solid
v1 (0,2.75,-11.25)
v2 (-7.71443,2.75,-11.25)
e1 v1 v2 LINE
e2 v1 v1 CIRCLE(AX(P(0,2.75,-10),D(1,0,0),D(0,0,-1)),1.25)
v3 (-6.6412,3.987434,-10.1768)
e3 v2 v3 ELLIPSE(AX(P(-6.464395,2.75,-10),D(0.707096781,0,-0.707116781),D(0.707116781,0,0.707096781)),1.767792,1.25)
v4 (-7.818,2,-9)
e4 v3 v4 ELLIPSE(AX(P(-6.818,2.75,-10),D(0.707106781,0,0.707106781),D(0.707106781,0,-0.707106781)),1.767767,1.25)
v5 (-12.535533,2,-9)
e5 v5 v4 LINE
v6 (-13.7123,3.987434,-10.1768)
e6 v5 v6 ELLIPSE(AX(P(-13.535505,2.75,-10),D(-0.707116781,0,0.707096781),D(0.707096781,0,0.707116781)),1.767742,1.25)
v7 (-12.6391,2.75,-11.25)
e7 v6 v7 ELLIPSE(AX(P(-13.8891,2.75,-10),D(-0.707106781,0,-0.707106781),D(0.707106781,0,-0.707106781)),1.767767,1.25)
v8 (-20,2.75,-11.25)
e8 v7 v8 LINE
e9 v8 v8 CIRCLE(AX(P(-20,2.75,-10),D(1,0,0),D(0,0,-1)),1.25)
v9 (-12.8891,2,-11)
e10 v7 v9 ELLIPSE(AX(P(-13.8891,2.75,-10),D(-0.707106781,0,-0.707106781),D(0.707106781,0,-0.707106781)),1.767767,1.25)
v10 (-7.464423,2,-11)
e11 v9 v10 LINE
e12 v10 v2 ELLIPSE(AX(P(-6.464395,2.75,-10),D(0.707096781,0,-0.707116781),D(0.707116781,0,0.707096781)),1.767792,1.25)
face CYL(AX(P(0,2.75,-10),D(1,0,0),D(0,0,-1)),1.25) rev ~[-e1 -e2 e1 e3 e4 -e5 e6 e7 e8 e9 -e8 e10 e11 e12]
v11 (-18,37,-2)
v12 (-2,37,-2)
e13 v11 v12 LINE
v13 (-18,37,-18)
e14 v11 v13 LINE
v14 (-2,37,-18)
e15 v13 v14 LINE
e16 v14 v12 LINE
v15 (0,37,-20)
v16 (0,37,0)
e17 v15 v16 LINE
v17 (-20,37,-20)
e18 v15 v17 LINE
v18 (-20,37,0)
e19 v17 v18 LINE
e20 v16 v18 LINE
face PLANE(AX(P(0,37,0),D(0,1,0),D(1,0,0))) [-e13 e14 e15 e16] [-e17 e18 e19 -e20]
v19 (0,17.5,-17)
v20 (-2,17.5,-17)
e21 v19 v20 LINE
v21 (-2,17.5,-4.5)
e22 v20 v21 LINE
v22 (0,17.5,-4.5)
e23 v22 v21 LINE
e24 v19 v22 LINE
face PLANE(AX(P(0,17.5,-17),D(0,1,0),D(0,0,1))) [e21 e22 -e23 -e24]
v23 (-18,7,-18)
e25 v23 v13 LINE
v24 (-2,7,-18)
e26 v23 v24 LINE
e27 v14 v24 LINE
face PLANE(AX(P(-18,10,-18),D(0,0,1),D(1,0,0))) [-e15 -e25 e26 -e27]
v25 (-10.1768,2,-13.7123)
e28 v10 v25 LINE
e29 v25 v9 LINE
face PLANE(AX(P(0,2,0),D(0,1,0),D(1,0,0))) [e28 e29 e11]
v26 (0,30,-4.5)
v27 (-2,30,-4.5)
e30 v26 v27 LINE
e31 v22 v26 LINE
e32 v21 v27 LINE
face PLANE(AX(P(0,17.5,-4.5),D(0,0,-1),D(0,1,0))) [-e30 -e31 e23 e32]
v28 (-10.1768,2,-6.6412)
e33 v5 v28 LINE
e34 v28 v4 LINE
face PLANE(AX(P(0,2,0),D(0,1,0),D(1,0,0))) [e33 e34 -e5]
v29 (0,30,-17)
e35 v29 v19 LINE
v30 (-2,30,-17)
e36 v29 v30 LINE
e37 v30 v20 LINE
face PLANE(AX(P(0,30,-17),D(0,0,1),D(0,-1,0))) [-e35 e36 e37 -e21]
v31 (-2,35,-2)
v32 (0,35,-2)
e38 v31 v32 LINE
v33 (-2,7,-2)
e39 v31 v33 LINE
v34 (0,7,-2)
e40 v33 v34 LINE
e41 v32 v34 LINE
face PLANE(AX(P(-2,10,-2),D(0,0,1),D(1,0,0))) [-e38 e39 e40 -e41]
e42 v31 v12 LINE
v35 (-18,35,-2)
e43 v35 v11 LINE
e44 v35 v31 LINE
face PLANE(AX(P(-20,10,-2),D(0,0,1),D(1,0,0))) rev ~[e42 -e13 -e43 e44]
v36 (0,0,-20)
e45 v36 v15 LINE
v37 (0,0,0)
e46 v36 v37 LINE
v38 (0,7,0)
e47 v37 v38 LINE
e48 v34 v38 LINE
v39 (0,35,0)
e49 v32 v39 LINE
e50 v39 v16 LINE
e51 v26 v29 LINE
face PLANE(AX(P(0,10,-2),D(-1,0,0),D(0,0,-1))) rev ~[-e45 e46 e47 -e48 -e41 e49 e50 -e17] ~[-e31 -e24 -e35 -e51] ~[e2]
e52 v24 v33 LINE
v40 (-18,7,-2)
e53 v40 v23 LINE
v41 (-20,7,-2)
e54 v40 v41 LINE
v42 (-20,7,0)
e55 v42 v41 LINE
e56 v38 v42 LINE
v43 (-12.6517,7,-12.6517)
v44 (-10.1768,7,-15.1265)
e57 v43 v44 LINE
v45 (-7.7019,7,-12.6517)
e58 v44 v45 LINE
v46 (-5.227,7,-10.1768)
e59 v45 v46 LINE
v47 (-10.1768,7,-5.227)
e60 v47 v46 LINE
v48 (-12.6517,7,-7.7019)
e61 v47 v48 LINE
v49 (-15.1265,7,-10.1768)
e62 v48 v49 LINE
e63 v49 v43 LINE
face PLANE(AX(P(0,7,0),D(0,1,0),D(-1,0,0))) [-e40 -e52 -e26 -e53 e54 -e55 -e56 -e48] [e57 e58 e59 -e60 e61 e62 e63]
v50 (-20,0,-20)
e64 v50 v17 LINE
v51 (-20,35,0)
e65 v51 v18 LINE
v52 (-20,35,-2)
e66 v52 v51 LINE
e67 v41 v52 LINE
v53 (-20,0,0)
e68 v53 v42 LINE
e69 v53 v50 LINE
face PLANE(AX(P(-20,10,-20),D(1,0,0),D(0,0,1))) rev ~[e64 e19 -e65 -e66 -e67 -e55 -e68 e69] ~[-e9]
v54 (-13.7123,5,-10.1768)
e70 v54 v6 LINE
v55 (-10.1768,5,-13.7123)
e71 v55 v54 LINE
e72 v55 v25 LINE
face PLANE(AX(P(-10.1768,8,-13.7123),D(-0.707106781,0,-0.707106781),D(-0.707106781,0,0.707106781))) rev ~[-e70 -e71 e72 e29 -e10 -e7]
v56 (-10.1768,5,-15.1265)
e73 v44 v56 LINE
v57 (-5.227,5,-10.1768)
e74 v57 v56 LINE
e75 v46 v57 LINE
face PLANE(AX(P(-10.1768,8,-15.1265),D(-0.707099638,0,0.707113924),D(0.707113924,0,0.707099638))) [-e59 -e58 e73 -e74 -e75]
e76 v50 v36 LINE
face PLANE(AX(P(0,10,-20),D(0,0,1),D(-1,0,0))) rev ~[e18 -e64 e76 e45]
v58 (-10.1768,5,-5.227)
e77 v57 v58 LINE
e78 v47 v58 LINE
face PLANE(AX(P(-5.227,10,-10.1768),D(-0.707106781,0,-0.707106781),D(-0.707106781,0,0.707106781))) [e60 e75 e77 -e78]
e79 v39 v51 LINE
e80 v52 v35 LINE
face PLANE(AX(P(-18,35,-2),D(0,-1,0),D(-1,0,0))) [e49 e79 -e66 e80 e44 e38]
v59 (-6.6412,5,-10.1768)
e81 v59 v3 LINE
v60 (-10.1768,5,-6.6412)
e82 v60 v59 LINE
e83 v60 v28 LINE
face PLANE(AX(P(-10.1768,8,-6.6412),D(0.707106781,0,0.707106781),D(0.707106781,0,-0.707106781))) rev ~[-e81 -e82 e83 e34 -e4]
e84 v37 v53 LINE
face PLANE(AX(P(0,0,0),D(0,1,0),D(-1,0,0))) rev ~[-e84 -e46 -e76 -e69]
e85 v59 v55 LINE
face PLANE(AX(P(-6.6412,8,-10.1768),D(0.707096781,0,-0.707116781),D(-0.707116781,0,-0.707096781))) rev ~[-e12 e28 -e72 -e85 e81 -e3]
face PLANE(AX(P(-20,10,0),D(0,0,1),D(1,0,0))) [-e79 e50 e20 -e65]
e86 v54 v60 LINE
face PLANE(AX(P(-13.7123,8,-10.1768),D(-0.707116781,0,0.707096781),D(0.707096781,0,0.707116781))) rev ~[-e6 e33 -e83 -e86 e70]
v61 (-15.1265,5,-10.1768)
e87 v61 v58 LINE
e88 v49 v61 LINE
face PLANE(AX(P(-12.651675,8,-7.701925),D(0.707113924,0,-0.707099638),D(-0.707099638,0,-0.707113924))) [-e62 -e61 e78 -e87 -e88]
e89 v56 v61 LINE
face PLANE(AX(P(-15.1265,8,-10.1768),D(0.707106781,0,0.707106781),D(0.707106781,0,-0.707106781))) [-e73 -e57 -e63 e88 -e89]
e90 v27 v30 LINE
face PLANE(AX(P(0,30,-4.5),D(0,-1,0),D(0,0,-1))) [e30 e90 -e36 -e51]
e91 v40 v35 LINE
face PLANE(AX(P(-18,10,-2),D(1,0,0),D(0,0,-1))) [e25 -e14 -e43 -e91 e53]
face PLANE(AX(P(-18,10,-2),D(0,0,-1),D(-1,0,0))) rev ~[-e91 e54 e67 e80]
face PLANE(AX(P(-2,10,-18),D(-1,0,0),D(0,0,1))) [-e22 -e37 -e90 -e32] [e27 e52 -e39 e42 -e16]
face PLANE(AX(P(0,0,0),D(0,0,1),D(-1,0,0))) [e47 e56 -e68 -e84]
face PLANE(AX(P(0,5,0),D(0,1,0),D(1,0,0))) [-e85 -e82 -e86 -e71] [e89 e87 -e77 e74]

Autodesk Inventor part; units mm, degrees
ref_plane "YZ Plane" through (0, 0, 0) normal (1, 0, 0) x (0, 1, 0)
sketch "Sketch1" plane through (0, 0, 0) normal (0, 1, 0) x (-1, 0, 0)
  line L0 (0, 0) -> (20, 0)
  line L1 (20, 0) -> (20, -20)
  line L2 (20, -20) -> (0, -20)
  line L3 (0, -20) -> (0, 0)
  dimension "d0" = 20
  dimension "d1" = 20
extrude "Extrusion1" add sketch "Sketch1" along normal blind 10
sketch "Sketch4" plane through (0, 10, 0) normal (0, 1, 0) x (1, 0, 0)
  line L0 (0, 20) -> (-20, 20) projected
  line L1 (-20, 20) -> (-20, 0) projected
  line L2 (-20, 0) -> (0, 0) projected
  line L3 (0, 0) -> (0, 20) projected
  line L4 (0, 20) -> (-20, 20) projected
  line L5 (-20, 20) -> (0, 0)
  line L6 (-10.1768, 10.1768) -> (-7.7019, 12.6517)
  line L7 (-7.7019, 12.6517) -> (-5.227, 10.1768)
  line L8 (-5.227, 10.1768) -> (-7.7019, 7.7019)
  line L9 (-7.7019, 7.7019) -> (-10.1768, 10.1768)
  line L10 (-10.1768, 10.1768) -> (-12.6517, 7.7019)
  line L11 (-12.6517, 7.7019) -> (-15.1265, 10.1768)
  line L12 (-15.1265, 10.1768) -> (-12.6517, 12.6517)
  line L13 (-12.6517, 12.6517) -> (-10.1768, 10.1768)
  line L14 (-12.6517, 12.6517) -> (-10.1768, 15.1265)
  line L15 (-10.1768, 15.1265) -> (-7.7019, 12.6517)
  line L16 (-7.7019, 12.6517) -> (-10.1768, 10.1768)
  line L17 (-10.1768, 10.1768) -> (-12.6517, 12.6517)
  line L18 (-12.6517, 7.7019) -> (-10.1768, 10.1768)
  line L19 (-10.1768, 10.1768) -> (-7.7019, 7.7019)
  line L20 (-7.7019, 7.7019) -> (-10.1768, 5.227)
  line L21 (-10.1768, 5.227) -> (-12.6517, 7.7019)
  dimension "d10" = 3.5
  dimension "d11" = 3.5
  dimension "d12" = 3.5
  dimension "d13" = 3.5
extrude "Extrusion3" cut sketch "Sketch4" against normal blind 8 contours L14 L15 L6 L5 | L5 L10 L11 L12 | L20 L21 L10 L5 | L5 L6 L7 L8
sketch "Sketch5" plane through (0, 10, 0) normal (0, 1, 0) x (1, 0, 0)
  line L0 (-5.227, 10.1768) -> (-10.1768, 5.227) projected
  line L1 (-10.1768, 5.227) -> (-15.1265, 10.1768) projected
  line L2 (-15.1265, 10.1768) -> (-10.1768, 15.1265) projected
  line L3 (-10.1768, 15.1265) -> (-5.227, 10.1768) projected
  line L4 (0, 20) -> (-20, 20) projected
  line L5 (-20, 20) -> (-20, 0) projected
  line L6 (-20, 0) -> (0, 0) projected
  line L7 (0, 0) -> (0, 20) projected
  line L8 (-18, 18) -> (-2, 18)
  line L9 (-2, 18) -> (-2, 2)
  line L10 (-2, 2) -> (-18, 2)
  line L11 (-18, 2) -> (-18, 18)
  line L12 (-18, 2) -> (-18, 0)
  line L13 (-2, 2) -> (-2, 0)
  line L14 (-20, 0) -> (0, 0) projected
  line L15 (-18, 2) -> (-20, 2)
  line L16 (-20, 20) -> (-20, 0) projected
  line L17 (-2, 2) -> (0, 2)
  line L18 (0, 0) -> (0, 20) projected
  point P0 (0, 2)
  dimension "d16" = 2
extrude "Extrusion4" add sketch "Sketch5" along normal blind 27 contours L7 L17 L9 L8 L11 L15 L5 L4
ref_plane "Work Plane1" through (-10, 10, -2) normal (1, 0, 0) x (0, 0, -1)
sketch "Sketch6" plane through (-10, 10, -2) normal (1, 0, 0) x (0, 0, -1)
  line L0 (3.227, 0) -> (8.1768, 0) projected
  line L1 (3.227, 0) -> (3.227, -8) projected
  line L2 (3.227, -8) -> (8.1768, -8) projected
  line L3 (8.1768, 0) -> (8.1768, -8) projected
  line L4 (8.1768, 0) -> (13.1265, 0) projected
  line L5 (8.1768, 0) -> (8.1768, -8) projected
  line L6 (8.1768, -8) -> (13.1265, -8) projected
  line L7 (13.1265, 0) -> (13.1265, -8) projected
  line L8 (16, 0) -> (0, 0) projected
  line L9 (16, 0) -> (16, 27) projected
  line L10 (0, 27) -> (16, 27) projected
  line L11 (0, 0) -> (0, 27) projected
  line L12 (8.1768, 0) -> (8.1768, -8) projected
  line L13 (8.1768, -8) -> (8.1768, -7.25)
  circle A0 centre (8.1768, -7.25) radius 0.75
  point P0 (-2, -10)
  dimension "d20" = 0.75
  dimension "d21" = 1.5
extrude "Extrusion5" cut sketch "Sketch6" along normal mid plane 27 contours A0 L3 | L3 A0
ref_plane "Work Plane2" through (-20, 0, -10) normal (0, 0, 1) x (1, 0, 0)
sketch "Sketch8" plane through (-20, 10, -2) normal (0, 0, 1) x (1, 0, 0)
  line L0 (2, 0) -> (0, 0) projected
  line L1 (2, 0) -> (2, 27) projected
  line L2 (0, 27) -> (2, 27) projected
  line L3 (0, 0) -> (0, 27) projected
  line L4 (20, 0) -> (18, 0) projected
  line L5 (20, 0) -> (20, 27) projected
  line L6 (18, 27) -> (20, 27) projected
  line L7 (18, 0) -> (18, 27) projected
  line L8 (20, 27) -> (0, 27) projected
  line L9 (0, 27) -> (20, 27)
  line L10 (20, 27) -> (20, 25)
  line L11 (20, 25) -> (0, 25)
  line L12 (0, 25) -> (0, 27)
  point P0 (20, -10)
  point P1 (0, 25)
  dimension "d30" = 20
  dimension "d31" = 2
extrude "Extrusion6" add sketch "Sketch8" along normal blind 2 contours L11 L3 L2 L1 | L1 L8 L7 L11 | L7 L6 L5 L11
ref_plane "Work Plane3" through (0, 8, 0) normal (0, 1, 0) x (1, 0, 0)
sketch "Sketch9" plane through (0, 8, 0) normal (0, 1, 0) x (1, 0, 0)
  line L0 (-10.1768, 15.1265) -> (-5.227, 10.1768) projected
  line L1 (-15.1265, 10.1768) -> (-10.1768, 15.1265) projected
  line L2 (-10.1768, 5.227) -> (-15.1265, 10.1768) projected
  line L3 (-5.227, 10.1768) -> (-10.1768, 5.227) projected
  line L4 (-6.6412, 10.1768) -> (-10.1768, 13.7123)
  line L5 (-10.1768, 13.7123) -> (-13.7123, 10.1768)
  line L6 (-13.7123, 10.1768) -> (-10.1768, 6.6412)
  line L7 (-10.1768, 6.6412) -> (-6.6412, 10.1768)
  point P0 (0, 0)
  dimension "d35" = 1
extrude "Extrusion7" add sketch "Sketch9" against normal blind 6
extrude "Extrusion8" cut sketch "Sketch6" along normal mid plane 27 contours A0 L3 | L3 A0
sketch "Sketch10" plane through (0, 0, 0) normal (1, 0, 0) x (0, 0, -1)
  line L0 (0, 0) -> (20, 0) projected
  line L1 (20, 0) -> (20, 37) projected
  line L2 (20, 37) -> (0, 37) projected
  line L3 (0, 35) -> (0, 37) projected
  line L4 (2, 35) -> (0, 35) projected
  line L5 (2, 10) -> (2, 35) projected
  line L6 (0, 10) -> (2, 10) projected
  line L7 (0, 0) -> (0, 10) projected
  line L8 (2, 35) -> (10, 35)
  line L9 (10, 35) -> (4.5, 35)
  line L10 (4.5, 35) -> (4.5, 30)
  line L11 (4.5, 30) -> (17, 30)
  line L12 (17, 30) -> (17, 17.5)
  line L13 (17, 17.5) -> (4.5, 17.5)
  line L14 (4.5, 17.5) -> (4.5, 30)
  dimension "d40" = 5.5
  dimension "d41" = 5
  dimension "d42" = 12.5
  dimension "d43" = 12.5
  dimension "d44" = 8
extrude "Extrusion9" cut sketch "Sketch10" against normal blind 6 contours L11 L12 L13 L14
move faces "Move1" translate (0, -3, 0) faces at (-8.5269, 8, -13.0052)
move faces "Move3" translate (0, -3, 0) faces at (-5.8013, 10, -5.8013)
sketch "Sketch12" plane through (-10, 10, -2) normal (1, 0, 0) x (0, 0, -1)
  circle A0 centre (8, -7.25) radius 0.75 projected
  point P0 (-2, -10)
extrude "Extrusion10" cut sketch "Sketch12" along normal mid plane 100
sketch "Sketch13" plane through (0, 0, 0) normal (1, 0, 0) x (0, 0, -1)
  arc A0 (10.0884, 3.4948) -> (10, 2) centre (10, 2.75) ccw projected
  circle A1 centre (10, 2.75) radius 1.25
  point P0 (0, 0)
  dimension "d58" = 2.5
extrude "Extrusion11" cut sketch "Sketch13" along normal mid plane 500
properties part number "latticeChamberv6"
